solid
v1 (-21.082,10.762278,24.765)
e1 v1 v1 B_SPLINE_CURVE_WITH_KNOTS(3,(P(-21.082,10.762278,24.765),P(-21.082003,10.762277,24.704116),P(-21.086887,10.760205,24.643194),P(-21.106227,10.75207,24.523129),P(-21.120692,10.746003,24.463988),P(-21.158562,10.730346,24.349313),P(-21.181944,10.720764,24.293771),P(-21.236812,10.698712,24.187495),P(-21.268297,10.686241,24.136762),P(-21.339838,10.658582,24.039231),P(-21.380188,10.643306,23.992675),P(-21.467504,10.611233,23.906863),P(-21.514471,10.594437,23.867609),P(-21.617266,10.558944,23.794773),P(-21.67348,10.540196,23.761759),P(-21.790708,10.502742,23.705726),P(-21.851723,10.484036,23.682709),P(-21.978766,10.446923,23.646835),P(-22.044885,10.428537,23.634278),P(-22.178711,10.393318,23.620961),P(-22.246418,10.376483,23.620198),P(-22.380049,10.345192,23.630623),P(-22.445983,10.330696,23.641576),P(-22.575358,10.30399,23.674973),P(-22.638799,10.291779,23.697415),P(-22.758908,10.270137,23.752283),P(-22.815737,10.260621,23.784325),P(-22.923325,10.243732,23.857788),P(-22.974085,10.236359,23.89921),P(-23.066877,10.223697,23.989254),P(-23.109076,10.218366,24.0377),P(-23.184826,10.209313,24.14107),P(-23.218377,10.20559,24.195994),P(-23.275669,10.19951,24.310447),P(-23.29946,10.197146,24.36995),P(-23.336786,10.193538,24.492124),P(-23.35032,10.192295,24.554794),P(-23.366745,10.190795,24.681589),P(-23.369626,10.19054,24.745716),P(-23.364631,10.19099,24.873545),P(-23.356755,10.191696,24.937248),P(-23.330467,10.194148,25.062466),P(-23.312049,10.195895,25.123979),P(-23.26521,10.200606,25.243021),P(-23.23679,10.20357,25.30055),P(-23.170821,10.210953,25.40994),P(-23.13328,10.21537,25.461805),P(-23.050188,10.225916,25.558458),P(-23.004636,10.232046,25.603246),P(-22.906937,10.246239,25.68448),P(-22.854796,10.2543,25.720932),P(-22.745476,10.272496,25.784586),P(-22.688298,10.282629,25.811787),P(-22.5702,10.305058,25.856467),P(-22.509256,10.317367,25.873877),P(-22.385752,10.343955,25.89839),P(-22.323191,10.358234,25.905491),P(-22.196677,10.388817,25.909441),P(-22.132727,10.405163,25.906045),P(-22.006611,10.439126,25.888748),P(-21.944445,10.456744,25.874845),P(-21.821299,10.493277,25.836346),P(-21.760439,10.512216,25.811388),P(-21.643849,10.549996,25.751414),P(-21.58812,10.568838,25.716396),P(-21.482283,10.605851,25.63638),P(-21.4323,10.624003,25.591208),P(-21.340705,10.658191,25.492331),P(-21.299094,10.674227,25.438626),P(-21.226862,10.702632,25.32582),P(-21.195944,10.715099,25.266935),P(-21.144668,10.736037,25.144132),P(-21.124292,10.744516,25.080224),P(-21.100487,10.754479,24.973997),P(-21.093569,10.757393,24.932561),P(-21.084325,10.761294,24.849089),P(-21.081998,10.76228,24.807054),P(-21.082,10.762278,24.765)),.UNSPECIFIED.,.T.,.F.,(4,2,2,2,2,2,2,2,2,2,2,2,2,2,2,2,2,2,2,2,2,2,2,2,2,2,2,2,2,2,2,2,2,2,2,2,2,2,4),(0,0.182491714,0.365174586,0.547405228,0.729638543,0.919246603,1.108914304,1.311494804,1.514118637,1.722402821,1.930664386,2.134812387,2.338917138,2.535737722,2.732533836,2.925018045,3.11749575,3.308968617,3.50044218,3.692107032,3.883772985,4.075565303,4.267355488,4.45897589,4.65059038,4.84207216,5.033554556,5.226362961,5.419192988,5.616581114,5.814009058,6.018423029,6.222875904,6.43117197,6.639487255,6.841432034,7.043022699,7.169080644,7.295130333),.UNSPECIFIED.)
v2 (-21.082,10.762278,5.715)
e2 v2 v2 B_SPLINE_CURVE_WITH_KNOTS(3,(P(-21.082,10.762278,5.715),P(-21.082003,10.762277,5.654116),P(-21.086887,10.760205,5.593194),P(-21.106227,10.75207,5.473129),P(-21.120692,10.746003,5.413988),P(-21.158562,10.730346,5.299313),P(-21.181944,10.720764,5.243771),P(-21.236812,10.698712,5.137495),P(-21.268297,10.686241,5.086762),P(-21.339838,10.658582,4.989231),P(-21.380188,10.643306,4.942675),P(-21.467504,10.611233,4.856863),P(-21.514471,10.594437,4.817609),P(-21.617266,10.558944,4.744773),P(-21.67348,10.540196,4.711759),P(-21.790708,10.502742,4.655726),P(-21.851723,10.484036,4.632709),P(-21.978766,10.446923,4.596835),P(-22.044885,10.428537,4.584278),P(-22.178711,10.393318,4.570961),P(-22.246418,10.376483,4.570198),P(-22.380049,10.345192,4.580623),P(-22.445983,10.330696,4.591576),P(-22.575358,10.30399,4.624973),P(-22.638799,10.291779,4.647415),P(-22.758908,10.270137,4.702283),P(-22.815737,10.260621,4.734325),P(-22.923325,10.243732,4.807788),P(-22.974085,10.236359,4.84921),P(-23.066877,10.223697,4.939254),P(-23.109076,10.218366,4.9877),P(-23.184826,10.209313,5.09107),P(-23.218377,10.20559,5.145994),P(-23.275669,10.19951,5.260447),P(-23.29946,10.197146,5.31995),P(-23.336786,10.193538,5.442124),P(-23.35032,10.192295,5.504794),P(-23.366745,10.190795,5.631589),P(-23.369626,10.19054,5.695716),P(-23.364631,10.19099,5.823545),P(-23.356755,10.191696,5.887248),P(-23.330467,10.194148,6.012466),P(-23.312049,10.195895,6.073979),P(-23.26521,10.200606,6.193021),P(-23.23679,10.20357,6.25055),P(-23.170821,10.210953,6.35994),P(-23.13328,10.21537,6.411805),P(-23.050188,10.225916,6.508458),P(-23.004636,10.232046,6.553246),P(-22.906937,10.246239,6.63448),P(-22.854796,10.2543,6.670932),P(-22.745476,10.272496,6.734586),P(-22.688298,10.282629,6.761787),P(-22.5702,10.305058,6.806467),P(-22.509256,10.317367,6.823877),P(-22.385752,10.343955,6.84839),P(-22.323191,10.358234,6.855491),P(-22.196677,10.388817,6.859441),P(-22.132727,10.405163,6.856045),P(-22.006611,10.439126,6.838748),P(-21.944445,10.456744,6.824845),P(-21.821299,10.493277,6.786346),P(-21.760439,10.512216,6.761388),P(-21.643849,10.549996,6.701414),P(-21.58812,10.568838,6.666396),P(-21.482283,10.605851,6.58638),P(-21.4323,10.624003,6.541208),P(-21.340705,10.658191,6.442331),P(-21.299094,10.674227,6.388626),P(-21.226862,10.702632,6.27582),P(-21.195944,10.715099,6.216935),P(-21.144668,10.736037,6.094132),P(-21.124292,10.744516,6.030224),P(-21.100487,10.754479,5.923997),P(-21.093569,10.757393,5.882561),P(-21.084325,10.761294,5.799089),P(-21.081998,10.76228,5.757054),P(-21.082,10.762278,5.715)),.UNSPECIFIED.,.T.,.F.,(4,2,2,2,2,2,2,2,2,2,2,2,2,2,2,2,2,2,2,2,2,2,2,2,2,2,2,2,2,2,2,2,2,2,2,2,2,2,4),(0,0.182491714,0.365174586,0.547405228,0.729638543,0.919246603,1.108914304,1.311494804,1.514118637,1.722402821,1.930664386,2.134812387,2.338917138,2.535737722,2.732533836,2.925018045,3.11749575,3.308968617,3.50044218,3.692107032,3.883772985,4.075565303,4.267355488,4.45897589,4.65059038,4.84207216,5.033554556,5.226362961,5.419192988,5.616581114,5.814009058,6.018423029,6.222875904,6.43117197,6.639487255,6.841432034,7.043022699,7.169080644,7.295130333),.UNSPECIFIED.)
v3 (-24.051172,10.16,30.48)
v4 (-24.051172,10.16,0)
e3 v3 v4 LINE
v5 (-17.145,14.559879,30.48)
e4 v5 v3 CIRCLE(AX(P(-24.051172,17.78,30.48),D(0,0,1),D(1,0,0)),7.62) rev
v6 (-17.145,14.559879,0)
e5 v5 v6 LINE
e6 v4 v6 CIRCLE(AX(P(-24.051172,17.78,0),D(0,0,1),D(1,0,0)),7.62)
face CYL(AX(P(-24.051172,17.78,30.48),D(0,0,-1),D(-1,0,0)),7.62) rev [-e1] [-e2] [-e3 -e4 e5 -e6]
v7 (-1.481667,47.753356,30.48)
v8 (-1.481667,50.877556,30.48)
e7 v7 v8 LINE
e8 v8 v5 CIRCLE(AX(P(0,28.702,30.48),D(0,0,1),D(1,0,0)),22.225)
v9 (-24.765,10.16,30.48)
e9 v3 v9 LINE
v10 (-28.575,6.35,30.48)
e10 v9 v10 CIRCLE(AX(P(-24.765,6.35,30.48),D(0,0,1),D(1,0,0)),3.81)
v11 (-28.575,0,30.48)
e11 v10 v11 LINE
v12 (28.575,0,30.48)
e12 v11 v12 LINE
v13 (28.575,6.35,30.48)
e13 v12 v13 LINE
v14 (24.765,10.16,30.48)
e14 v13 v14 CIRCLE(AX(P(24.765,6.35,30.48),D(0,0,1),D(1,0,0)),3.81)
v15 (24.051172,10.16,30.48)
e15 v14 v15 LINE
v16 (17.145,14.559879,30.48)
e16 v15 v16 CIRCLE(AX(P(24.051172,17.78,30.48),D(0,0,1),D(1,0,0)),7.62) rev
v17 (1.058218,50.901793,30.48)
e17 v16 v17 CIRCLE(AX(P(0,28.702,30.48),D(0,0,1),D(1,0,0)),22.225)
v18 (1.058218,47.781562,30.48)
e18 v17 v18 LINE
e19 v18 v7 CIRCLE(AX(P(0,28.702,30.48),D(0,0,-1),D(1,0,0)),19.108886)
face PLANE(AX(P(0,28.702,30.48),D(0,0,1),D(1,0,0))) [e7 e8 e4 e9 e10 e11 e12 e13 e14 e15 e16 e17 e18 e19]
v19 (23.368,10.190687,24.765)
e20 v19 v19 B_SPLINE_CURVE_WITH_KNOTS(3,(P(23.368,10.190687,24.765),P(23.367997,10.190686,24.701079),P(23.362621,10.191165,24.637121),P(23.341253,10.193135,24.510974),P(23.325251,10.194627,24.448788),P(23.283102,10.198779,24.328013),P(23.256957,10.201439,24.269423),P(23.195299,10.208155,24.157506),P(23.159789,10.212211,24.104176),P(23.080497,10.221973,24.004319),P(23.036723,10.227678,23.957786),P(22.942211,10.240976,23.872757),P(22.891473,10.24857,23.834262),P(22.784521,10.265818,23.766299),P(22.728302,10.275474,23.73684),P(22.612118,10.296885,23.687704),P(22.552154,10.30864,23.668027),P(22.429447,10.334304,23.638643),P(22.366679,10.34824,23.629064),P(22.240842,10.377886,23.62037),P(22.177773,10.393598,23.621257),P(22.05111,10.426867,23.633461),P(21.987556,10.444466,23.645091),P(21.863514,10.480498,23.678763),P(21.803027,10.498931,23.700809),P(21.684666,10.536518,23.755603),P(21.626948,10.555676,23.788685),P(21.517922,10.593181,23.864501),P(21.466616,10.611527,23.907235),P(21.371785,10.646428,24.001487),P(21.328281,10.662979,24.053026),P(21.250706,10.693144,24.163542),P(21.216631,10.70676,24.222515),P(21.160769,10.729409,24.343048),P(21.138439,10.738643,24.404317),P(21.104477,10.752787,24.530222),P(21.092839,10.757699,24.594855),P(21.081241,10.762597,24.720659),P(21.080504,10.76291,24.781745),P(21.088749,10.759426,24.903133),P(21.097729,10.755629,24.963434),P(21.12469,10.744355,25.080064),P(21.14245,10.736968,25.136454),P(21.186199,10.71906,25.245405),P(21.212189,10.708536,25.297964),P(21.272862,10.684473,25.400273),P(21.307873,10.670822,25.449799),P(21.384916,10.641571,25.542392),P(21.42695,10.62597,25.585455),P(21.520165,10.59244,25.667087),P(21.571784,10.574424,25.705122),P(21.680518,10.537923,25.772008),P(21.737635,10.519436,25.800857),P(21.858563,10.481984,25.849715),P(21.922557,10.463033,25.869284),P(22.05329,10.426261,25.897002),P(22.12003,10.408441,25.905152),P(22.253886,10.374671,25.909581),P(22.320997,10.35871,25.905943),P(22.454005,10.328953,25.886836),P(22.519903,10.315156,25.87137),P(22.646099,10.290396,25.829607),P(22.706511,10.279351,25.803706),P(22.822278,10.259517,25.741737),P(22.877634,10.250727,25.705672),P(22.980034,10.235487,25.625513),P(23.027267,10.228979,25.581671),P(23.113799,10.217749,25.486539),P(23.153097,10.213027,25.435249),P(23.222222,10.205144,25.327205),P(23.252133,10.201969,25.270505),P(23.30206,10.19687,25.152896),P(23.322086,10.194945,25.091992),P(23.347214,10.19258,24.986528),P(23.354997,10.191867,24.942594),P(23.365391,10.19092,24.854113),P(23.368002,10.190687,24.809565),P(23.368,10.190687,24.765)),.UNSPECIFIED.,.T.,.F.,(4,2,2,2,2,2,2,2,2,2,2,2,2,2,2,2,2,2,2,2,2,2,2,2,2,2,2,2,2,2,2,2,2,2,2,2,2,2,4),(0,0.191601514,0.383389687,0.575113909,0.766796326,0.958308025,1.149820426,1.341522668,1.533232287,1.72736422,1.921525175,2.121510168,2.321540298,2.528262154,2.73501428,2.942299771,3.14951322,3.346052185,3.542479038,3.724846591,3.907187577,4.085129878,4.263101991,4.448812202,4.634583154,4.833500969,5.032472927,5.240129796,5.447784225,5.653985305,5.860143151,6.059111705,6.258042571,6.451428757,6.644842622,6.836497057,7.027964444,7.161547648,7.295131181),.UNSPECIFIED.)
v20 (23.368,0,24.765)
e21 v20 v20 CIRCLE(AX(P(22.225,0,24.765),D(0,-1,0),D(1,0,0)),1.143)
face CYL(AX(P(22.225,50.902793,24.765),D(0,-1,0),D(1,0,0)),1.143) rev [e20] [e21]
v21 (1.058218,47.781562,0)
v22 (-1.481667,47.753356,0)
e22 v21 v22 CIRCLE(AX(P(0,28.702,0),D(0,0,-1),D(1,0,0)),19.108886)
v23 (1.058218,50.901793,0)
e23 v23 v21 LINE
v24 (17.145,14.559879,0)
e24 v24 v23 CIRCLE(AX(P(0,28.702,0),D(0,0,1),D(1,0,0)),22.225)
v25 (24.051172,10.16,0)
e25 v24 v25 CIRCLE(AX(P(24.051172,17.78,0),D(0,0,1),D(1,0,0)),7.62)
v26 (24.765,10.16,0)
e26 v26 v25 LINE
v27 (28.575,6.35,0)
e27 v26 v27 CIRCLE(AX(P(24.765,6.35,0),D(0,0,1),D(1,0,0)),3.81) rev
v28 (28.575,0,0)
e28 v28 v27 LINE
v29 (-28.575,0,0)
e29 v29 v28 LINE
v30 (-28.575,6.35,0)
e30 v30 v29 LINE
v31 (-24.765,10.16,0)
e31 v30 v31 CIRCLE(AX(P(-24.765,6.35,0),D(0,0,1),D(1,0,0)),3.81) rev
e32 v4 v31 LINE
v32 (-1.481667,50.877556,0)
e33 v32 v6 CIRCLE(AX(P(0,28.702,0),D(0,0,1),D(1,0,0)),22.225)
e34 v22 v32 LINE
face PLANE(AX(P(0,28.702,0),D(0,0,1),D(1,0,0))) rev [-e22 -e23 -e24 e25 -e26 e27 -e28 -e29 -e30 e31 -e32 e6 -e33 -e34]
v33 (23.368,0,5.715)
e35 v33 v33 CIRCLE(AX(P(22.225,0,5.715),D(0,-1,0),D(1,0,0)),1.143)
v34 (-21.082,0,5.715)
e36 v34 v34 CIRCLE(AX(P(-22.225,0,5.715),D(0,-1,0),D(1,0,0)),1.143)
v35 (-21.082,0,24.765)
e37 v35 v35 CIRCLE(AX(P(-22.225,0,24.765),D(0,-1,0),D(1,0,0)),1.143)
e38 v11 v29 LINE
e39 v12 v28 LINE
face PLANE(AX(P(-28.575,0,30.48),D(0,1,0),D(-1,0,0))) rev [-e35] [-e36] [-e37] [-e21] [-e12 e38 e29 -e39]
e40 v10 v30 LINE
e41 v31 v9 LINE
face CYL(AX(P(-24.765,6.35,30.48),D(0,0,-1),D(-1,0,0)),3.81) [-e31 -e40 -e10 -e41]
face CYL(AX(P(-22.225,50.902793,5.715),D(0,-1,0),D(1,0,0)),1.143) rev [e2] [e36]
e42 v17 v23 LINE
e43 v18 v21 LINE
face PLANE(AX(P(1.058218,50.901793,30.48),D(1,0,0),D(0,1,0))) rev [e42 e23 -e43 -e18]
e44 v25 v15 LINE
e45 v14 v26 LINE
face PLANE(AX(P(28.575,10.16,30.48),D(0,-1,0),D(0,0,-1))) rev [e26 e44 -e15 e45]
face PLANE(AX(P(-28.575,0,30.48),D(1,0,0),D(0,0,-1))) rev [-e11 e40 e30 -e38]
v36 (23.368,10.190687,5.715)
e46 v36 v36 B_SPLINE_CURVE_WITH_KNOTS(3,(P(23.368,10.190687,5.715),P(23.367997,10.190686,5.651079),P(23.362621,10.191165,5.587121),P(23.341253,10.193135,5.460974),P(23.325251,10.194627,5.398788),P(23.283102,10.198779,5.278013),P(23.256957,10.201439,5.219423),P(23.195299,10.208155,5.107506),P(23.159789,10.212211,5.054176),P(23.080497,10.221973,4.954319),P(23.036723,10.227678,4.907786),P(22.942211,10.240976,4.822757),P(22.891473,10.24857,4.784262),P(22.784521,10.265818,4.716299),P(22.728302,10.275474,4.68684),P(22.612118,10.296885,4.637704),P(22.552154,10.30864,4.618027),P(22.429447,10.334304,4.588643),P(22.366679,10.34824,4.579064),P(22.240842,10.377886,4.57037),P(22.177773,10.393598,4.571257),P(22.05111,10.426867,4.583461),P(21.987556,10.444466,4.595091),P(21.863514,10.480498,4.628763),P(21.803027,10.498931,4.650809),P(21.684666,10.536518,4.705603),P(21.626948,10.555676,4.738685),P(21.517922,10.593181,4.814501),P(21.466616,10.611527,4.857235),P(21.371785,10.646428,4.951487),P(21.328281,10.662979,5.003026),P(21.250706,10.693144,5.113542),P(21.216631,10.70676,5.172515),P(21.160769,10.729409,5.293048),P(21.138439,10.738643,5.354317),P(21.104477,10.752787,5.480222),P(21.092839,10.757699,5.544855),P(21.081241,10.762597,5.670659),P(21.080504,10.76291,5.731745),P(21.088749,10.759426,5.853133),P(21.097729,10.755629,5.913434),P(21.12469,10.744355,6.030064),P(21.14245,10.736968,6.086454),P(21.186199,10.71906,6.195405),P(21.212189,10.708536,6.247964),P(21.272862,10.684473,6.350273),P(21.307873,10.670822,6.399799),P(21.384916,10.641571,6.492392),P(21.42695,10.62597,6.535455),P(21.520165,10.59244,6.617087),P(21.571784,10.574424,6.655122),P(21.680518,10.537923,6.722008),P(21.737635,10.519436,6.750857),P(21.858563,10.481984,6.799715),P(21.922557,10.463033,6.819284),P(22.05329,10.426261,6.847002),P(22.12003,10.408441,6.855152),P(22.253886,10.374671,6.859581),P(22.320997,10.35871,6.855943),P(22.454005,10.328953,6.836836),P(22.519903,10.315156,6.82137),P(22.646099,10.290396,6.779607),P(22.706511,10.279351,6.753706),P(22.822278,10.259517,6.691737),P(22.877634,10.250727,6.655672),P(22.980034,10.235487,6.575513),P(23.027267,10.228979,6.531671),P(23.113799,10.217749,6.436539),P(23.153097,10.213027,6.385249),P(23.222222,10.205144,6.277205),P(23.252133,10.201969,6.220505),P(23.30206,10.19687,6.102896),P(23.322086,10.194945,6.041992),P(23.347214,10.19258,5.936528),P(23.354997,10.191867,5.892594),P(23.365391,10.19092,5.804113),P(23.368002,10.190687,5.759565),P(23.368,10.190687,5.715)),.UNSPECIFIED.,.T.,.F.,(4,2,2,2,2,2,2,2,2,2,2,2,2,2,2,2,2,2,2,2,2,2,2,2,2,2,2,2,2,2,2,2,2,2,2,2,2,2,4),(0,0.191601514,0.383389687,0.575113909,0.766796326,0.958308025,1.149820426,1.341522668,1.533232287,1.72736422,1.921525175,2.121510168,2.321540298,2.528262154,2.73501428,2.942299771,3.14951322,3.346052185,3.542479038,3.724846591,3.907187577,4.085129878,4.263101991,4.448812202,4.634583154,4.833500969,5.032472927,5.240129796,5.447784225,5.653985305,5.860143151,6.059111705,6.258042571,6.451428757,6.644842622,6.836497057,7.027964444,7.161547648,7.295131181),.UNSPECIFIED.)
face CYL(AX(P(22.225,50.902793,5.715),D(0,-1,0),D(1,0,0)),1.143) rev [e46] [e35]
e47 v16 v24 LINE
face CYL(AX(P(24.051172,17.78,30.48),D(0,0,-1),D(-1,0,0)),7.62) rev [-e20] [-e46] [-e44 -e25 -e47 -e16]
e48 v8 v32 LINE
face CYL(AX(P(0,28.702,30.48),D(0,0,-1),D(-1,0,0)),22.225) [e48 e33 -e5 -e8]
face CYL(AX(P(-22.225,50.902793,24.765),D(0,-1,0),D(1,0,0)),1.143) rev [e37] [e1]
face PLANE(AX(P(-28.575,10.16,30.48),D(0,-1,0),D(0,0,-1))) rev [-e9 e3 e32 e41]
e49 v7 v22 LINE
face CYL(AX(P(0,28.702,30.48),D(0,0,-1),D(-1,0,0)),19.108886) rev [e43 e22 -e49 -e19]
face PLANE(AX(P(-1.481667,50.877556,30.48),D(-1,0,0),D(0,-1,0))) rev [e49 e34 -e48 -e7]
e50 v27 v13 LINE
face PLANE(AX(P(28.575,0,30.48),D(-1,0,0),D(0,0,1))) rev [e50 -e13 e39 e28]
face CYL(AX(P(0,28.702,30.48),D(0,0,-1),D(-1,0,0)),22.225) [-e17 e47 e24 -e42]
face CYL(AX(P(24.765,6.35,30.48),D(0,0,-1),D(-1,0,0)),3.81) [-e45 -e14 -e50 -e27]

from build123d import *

# Parameters (mm, degrees)
BOSS_EXTRUDE1_DEPTH = 30.48
FILLET1_R           = 7.62
FILLET2_R           = 3.81
CUT_EXTRUDE1_REACH  = 67.853
SKETCH2_R           = 1.143


with BuildPart() as part:
    # Sketch1 → Boss-Extrude1 (new body)
    with BuildSketch(Plane.XY):
        with BuildLine():
            Line((-28.575, 0), (28.575, 0))
            Line((28.575, 0), (28.575, 10.16))
            Line((28.575, 10.16), (17.145, 10.16))
            Line((17.145, 10.16), (17.145, 14.559878518))
            ThreePointArc((17.145, 14.559878518), (20.322966492, 37.697980101), (1.058217697, 50.901792799))
            Line((1.058217697, 50.901792799), (1.058217697, 47.78156187))
            ThreePointArc((1.058217697, 47.78156187), (0.212193658, 9.594292663), (-1.481666667, 47.753356112))
            Line((-1.481666667, 47.753356112), (-1.481666667, 50.877556112))
            ThreePointArc((-1.481666667, 50.877556112), (-20.407880934, 37.503648753), (-17.145, 14.559878518))
            Line((-17.145, 14.559878518), (-17.145, 10.16))
            Line((-17.145, 10.16), (-28.575, 10.16))
            Line((-28.575, 10.16), (-28.575, 0))
        make_face()
    extrude(amount=BOSS_EXTRUDE1_DEPTH)

    # Fillet1
    # the kernel refuses this fillet: 7.62 mm, written as the material it adds along each edge
    with BuildSketch(Plane(origin=(-17.145, 10.16, 0), x_dir=(0, 1, 0), z_dir=(0, 0, 1))) as fillet1_piece_1:
        with BuildLine():
            CenterArc((7.62, 6.906172431), FILLET1_R, 180, 65.001905453)
            Line((0, 6.906172431), (-0.1524, 6.906172431))
            Line((-0.1524, 6.906172431), (-0.1524, 0))
            Line((-0.1524, 0), (0, -0.1524))
            ThreePointArc((0, -0.1524), (2.199939259, -0.1524), (4.335476089, -0.138123449))
            Line((4.335476089, -0.138123449), (4.399878518, 0))
        make_face()
    extrude(amount=30.48)
    with BuildSketch(Plane(origin=(17.145, 10.16, 0), x_dir=(1, 0, 0), z_dir=(0, 0, 1))) as fillet1_piece_2:
        with BuildLine():
            CenterArc((6.906172431, 7.62), FILLET1_R, 204.998094547, 65.001905453)
            Line((0, 4.399878518), (-0.138123449, 4.335476089))
            ThreePointArc((-0.138123449, 4.335476089), (-0.1524, 2.199939259), (-0.1524, 0))
            Line((-0.1524, 0), (0, -0.1524))
            Line((0, -0.1524), (6.906172431, -0.1524))
            Line((6.906172431, -0.1524), (6.906172431, 0))
        make_face()
    extrude(amount=30.48)

    # Fillet2
    fillet2_edges = [part.edges().sort_by_distance(p)[0] for p in [
        (-28.575, 10.16, 15.24),
        (28.575, 10.16, 15.24),
    ]]
    fillet(fillet2_edges, radius=FILLET2_R)

    # Sketch2 → Cut-Extrude1 (cut, up to next)
    with BuildSketch(Plane.XZ, mode=Mode.PRIVATE) as cut_extrude1_sk1:
        with Locations((-22.225, 5.715)):
            Circle(SKETCH2_R)
    cut_extrude1_tool1 = extrude(cut_extrude1_sk1.sketch, amount=-CUT_EXTRUDE1_REACH, mode=Mode.PRIVATE) & part.part
    # Sketch2 → Cut-Extrude1 (cut, up to next)
    with BuildSketch(Plane.XZ, mode=Mode.PRIVATE) as cut_extrude1_sk2:
        with Locations((-22.225, 24.765)):
            Circle(SKETCH2_R)
    cut_extrude1_tool2 = extrude(cut_extrude1_sk2.sketch, amount=-CUT_EXTRUDE1_REACH, mode=Mode.PRIVATE) & part.part
    # Sketch2 → Cut-Extrude1 (cut, up to next)
    with BuildSketch(Plane.XZ, mode=Mode.PRIVATE) as cut_extrude1_sk3:
        with Locations((22.225, 24.765)):
            Circle(SKETCH2_R)
    cut_extrude1_tool3 = extrude(cut_extrude1_sk3.sketch, amount=-CUT_EXTRUDE1_REACH, mode=Mode.PRIVATE) & part.part
    # Sketch2 → Cut-Extrude1 (cut, up to next)
    with BuildSketch(Plane.XZ, mode=Mode.PRIVATE) as cut_extrude1_sk4:
        with Locations((22.225, 5.715)):
            Circle(SKETCH2_R)
    cut_extrude1_tool4 = extrude(cut_extrude1_sk4.sketch, amount=-CUT_EXTRUDE1_REACH, mode=Mode.PRIVATE) & part.part
    add(cut_extrude1_tool1.solids().sort_by_distance((-22.225, 0, 5.715))[0], mode=Mode.SUBTRACT)
    add(cut_extrude1_tool2.solids().sort_by_distance((-22.225, 0, 24.765))[0], mode=Mode.SUBTRACT)
    add(cut_extrude1_tool3.solids().sort_by_distance((22.225, 0, 24.765))[0], mode=Mode.SUBTRACT)
    add(cut_extrude1_tool4.solids().sort_by_distance((22.225, 0, 5.715))[0], mode=Mode.SUBTRACT)


solid = part.part
